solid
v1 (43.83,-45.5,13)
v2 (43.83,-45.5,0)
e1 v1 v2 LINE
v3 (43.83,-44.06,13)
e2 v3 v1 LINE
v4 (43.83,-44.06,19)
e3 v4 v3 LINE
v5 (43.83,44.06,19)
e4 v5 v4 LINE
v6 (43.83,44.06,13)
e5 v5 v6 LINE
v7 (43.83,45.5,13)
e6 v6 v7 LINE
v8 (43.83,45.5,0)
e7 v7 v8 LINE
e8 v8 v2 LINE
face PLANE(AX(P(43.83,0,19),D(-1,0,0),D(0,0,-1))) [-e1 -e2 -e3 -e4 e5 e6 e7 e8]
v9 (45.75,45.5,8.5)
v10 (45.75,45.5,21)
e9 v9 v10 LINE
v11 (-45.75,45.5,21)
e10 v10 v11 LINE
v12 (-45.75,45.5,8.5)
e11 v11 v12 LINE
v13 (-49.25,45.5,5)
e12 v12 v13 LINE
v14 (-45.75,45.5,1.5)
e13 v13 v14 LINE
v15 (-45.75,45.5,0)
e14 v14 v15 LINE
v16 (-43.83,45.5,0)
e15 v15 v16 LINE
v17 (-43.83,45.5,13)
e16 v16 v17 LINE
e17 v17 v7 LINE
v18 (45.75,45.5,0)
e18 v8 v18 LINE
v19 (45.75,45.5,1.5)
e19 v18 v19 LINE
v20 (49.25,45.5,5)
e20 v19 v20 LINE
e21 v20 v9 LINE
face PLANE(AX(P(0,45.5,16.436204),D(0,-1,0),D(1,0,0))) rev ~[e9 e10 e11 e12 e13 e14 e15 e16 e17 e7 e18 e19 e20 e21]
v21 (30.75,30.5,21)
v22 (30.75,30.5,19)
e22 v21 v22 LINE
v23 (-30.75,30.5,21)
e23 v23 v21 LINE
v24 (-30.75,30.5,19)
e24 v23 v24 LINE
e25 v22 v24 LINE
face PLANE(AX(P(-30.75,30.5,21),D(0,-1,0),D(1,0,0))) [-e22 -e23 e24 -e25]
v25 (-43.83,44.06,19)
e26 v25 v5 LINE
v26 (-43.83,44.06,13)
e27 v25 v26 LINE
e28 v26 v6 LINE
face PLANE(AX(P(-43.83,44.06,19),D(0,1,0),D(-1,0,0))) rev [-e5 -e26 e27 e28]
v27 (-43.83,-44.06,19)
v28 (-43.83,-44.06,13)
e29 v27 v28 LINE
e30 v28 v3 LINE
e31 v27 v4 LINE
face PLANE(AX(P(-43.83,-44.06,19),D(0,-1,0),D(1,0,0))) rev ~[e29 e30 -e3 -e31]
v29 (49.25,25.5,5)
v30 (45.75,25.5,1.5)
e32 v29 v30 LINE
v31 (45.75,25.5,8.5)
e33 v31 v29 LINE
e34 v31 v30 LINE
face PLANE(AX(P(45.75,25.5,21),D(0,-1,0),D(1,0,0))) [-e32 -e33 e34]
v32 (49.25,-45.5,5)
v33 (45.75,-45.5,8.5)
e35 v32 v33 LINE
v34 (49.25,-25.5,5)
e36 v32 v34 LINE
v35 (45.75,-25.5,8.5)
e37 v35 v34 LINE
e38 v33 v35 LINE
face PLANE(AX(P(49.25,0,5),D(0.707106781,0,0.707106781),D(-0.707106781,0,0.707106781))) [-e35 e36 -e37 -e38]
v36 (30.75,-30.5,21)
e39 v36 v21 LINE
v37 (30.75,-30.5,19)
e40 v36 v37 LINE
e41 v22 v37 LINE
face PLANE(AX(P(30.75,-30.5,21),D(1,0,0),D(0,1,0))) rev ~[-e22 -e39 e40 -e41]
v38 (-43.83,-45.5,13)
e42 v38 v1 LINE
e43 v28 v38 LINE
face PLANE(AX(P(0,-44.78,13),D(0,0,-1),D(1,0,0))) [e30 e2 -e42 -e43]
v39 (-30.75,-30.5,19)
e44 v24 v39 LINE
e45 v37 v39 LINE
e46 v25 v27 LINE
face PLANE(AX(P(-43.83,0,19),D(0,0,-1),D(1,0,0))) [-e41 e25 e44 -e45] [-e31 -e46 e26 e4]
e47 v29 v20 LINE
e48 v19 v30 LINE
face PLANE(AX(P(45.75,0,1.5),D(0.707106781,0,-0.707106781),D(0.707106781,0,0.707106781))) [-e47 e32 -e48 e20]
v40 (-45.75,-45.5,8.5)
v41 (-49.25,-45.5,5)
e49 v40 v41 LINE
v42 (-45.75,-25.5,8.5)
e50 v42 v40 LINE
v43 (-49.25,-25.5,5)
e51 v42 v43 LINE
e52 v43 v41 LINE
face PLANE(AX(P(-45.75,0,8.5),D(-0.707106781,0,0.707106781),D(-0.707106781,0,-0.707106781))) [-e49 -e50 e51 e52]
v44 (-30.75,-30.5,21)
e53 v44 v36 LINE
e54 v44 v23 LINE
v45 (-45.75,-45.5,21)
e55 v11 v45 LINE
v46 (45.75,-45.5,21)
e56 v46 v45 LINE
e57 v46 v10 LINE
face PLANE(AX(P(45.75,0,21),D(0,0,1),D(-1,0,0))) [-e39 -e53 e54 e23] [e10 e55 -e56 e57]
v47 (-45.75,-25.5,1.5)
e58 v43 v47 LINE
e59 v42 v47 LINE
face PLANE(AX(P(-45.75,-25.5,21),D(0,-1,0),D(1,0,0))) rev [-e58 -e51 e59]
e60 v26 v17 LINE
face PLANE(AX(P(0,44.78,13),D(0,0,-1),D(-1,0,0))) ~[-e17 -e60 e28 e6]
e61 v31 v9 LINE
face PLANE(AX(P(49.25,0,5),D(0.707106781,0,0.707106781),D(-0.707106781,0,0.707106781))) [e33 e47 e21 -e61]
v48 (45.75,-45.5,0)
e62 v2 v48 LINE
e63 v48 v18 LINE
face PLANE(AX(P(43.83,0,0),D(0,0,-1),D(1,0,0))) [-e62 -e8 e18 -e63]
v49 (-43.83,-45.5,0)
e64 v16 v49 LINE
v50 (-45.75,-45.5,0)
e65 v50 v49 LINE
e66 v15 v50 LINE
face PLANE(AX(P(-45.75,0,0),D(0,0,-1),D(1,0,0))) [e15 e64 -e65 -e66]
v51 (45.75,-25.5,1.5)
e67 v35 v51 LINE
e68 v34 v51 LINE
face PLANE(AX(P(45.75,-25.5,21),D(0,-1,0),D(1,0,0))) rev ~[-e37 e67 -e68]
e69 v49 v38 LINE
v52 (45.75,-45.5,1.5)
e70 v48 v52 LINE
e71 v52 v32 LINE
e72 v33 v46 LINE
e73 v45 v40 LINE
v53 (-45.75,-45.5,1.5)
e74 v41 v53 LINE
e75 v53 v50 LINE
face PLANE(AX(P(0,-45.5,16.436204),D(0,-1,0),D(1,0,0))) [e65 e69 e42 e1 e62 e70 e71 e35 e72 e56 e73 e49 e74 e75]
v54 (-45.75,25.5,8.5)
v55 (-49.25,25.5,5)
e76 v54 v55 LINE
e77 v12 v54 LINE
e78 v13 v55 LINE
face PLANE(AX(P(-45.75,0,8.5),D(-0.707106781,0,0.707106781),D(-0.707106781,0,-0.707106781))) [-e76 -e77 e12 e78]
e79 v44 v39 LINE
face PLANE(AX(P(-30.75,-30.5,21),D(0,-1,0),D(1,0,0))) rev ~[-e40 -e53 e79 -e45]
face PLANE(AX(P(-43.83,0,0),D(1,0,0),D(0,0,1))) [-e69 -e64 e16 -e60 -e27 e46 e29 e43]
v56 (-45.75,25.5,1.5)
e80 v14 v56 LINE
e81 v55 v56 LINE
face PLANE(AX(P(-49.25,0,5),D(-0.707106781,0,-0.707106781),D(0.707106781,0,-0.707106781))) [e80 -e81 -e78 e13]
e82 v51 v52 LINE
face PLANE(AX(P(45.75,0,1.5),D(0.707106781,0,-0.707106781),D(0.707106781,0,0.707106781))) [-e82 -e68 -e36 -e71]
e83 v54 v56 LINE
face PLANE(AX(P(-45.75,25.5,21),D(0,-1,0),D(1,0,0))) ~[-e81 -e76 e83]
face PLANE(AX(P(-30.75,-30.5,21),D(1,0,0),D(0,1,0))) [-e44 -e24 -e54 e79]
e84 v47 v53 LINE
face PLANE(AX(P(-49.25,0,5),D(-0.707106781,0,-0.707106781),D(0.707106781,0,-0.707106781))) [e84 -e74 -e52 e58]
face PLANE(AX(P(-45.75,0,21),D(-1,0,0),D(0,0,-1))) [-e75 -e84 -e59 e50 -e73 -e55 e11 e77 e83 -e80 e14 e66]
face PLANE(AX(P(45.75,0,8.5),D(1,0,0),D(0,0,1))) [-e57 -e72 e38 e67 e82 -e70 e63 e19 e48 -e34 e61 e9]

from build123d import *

# Parameters (mm, degrees)
F1_DEPTH = 45.5
F2_W     = 61.5
F2_H     = 61
F3_DEPTH = 21.001
F4_W     = 3.5
F4_H     = 51
F5_DEPTH = 21.001
F6_W     = 87.66
F6_H     = 1.44
F7_DEPTH = 6


# Not quite as in the source:
# - a pattern or mirror of a feature is missing from the dataset's text; its kind, count and spacing are read off the source's solid


with BuildPart() as f1:
    # F0 (on Front) → F1 (new body, symmetric)
    with BuildSketch(Plane.XZ):
        Polygon((45.75, 21), (-45.75, 21), (-45.75, 8.5), (-49.25, 5), (-45.75, 1.5), (-45.75, 0), (-43.83, 0), (-43.83, 19), (43.83, 19), (43.83, 0), (45.75, 0), (45.75, 1.5), (49.25, 5), (45.75, 8.5), align=None)
    extrude(amount=F1_DEPTH, both=True)

    # F2 (on face) → F3 (cut, through all)
    with BuildSketch(Plane.XY.offset(21)):
        Rectangle(F2_W, F2_H)
    extrude(amount=-F3_DEPTH, mode=Mode.SUBTRACT)

    # F4 (on face) → F5 (cut, through all)
    with BuildSketch(Plane.XY.offset(21)):
        with Locations((47.5, 0)):
            Rectangle(F4_W, F4_H)
    f5 = extrude(amount=-F5_DEPTH, mode=Mode.SUBTRACT)

    # F5_copies: F5 across plane
    add(f5.mirror(Plane(origin=(0, 0, 0), x_dir=(0, 0, -1), z_dir=(-1, 0, 0))), mode=Mode.SUBTRACT)

    # F6 (on face) → F7 (join)
    with BuildSketch(Plane(origin=(0, 0, 19), x_dir=(1, 0, 0), z_dir=(0, 0, -1))):
        with Locations((0, 44.78)):
            Rectangle(F6_W, F6_H)
    f7 = extrude(amount=F7_DEPTH)

    # F7_copies: F7 across plane
    add(f7.mirror(Plane.ZX))


solid = f1.part
